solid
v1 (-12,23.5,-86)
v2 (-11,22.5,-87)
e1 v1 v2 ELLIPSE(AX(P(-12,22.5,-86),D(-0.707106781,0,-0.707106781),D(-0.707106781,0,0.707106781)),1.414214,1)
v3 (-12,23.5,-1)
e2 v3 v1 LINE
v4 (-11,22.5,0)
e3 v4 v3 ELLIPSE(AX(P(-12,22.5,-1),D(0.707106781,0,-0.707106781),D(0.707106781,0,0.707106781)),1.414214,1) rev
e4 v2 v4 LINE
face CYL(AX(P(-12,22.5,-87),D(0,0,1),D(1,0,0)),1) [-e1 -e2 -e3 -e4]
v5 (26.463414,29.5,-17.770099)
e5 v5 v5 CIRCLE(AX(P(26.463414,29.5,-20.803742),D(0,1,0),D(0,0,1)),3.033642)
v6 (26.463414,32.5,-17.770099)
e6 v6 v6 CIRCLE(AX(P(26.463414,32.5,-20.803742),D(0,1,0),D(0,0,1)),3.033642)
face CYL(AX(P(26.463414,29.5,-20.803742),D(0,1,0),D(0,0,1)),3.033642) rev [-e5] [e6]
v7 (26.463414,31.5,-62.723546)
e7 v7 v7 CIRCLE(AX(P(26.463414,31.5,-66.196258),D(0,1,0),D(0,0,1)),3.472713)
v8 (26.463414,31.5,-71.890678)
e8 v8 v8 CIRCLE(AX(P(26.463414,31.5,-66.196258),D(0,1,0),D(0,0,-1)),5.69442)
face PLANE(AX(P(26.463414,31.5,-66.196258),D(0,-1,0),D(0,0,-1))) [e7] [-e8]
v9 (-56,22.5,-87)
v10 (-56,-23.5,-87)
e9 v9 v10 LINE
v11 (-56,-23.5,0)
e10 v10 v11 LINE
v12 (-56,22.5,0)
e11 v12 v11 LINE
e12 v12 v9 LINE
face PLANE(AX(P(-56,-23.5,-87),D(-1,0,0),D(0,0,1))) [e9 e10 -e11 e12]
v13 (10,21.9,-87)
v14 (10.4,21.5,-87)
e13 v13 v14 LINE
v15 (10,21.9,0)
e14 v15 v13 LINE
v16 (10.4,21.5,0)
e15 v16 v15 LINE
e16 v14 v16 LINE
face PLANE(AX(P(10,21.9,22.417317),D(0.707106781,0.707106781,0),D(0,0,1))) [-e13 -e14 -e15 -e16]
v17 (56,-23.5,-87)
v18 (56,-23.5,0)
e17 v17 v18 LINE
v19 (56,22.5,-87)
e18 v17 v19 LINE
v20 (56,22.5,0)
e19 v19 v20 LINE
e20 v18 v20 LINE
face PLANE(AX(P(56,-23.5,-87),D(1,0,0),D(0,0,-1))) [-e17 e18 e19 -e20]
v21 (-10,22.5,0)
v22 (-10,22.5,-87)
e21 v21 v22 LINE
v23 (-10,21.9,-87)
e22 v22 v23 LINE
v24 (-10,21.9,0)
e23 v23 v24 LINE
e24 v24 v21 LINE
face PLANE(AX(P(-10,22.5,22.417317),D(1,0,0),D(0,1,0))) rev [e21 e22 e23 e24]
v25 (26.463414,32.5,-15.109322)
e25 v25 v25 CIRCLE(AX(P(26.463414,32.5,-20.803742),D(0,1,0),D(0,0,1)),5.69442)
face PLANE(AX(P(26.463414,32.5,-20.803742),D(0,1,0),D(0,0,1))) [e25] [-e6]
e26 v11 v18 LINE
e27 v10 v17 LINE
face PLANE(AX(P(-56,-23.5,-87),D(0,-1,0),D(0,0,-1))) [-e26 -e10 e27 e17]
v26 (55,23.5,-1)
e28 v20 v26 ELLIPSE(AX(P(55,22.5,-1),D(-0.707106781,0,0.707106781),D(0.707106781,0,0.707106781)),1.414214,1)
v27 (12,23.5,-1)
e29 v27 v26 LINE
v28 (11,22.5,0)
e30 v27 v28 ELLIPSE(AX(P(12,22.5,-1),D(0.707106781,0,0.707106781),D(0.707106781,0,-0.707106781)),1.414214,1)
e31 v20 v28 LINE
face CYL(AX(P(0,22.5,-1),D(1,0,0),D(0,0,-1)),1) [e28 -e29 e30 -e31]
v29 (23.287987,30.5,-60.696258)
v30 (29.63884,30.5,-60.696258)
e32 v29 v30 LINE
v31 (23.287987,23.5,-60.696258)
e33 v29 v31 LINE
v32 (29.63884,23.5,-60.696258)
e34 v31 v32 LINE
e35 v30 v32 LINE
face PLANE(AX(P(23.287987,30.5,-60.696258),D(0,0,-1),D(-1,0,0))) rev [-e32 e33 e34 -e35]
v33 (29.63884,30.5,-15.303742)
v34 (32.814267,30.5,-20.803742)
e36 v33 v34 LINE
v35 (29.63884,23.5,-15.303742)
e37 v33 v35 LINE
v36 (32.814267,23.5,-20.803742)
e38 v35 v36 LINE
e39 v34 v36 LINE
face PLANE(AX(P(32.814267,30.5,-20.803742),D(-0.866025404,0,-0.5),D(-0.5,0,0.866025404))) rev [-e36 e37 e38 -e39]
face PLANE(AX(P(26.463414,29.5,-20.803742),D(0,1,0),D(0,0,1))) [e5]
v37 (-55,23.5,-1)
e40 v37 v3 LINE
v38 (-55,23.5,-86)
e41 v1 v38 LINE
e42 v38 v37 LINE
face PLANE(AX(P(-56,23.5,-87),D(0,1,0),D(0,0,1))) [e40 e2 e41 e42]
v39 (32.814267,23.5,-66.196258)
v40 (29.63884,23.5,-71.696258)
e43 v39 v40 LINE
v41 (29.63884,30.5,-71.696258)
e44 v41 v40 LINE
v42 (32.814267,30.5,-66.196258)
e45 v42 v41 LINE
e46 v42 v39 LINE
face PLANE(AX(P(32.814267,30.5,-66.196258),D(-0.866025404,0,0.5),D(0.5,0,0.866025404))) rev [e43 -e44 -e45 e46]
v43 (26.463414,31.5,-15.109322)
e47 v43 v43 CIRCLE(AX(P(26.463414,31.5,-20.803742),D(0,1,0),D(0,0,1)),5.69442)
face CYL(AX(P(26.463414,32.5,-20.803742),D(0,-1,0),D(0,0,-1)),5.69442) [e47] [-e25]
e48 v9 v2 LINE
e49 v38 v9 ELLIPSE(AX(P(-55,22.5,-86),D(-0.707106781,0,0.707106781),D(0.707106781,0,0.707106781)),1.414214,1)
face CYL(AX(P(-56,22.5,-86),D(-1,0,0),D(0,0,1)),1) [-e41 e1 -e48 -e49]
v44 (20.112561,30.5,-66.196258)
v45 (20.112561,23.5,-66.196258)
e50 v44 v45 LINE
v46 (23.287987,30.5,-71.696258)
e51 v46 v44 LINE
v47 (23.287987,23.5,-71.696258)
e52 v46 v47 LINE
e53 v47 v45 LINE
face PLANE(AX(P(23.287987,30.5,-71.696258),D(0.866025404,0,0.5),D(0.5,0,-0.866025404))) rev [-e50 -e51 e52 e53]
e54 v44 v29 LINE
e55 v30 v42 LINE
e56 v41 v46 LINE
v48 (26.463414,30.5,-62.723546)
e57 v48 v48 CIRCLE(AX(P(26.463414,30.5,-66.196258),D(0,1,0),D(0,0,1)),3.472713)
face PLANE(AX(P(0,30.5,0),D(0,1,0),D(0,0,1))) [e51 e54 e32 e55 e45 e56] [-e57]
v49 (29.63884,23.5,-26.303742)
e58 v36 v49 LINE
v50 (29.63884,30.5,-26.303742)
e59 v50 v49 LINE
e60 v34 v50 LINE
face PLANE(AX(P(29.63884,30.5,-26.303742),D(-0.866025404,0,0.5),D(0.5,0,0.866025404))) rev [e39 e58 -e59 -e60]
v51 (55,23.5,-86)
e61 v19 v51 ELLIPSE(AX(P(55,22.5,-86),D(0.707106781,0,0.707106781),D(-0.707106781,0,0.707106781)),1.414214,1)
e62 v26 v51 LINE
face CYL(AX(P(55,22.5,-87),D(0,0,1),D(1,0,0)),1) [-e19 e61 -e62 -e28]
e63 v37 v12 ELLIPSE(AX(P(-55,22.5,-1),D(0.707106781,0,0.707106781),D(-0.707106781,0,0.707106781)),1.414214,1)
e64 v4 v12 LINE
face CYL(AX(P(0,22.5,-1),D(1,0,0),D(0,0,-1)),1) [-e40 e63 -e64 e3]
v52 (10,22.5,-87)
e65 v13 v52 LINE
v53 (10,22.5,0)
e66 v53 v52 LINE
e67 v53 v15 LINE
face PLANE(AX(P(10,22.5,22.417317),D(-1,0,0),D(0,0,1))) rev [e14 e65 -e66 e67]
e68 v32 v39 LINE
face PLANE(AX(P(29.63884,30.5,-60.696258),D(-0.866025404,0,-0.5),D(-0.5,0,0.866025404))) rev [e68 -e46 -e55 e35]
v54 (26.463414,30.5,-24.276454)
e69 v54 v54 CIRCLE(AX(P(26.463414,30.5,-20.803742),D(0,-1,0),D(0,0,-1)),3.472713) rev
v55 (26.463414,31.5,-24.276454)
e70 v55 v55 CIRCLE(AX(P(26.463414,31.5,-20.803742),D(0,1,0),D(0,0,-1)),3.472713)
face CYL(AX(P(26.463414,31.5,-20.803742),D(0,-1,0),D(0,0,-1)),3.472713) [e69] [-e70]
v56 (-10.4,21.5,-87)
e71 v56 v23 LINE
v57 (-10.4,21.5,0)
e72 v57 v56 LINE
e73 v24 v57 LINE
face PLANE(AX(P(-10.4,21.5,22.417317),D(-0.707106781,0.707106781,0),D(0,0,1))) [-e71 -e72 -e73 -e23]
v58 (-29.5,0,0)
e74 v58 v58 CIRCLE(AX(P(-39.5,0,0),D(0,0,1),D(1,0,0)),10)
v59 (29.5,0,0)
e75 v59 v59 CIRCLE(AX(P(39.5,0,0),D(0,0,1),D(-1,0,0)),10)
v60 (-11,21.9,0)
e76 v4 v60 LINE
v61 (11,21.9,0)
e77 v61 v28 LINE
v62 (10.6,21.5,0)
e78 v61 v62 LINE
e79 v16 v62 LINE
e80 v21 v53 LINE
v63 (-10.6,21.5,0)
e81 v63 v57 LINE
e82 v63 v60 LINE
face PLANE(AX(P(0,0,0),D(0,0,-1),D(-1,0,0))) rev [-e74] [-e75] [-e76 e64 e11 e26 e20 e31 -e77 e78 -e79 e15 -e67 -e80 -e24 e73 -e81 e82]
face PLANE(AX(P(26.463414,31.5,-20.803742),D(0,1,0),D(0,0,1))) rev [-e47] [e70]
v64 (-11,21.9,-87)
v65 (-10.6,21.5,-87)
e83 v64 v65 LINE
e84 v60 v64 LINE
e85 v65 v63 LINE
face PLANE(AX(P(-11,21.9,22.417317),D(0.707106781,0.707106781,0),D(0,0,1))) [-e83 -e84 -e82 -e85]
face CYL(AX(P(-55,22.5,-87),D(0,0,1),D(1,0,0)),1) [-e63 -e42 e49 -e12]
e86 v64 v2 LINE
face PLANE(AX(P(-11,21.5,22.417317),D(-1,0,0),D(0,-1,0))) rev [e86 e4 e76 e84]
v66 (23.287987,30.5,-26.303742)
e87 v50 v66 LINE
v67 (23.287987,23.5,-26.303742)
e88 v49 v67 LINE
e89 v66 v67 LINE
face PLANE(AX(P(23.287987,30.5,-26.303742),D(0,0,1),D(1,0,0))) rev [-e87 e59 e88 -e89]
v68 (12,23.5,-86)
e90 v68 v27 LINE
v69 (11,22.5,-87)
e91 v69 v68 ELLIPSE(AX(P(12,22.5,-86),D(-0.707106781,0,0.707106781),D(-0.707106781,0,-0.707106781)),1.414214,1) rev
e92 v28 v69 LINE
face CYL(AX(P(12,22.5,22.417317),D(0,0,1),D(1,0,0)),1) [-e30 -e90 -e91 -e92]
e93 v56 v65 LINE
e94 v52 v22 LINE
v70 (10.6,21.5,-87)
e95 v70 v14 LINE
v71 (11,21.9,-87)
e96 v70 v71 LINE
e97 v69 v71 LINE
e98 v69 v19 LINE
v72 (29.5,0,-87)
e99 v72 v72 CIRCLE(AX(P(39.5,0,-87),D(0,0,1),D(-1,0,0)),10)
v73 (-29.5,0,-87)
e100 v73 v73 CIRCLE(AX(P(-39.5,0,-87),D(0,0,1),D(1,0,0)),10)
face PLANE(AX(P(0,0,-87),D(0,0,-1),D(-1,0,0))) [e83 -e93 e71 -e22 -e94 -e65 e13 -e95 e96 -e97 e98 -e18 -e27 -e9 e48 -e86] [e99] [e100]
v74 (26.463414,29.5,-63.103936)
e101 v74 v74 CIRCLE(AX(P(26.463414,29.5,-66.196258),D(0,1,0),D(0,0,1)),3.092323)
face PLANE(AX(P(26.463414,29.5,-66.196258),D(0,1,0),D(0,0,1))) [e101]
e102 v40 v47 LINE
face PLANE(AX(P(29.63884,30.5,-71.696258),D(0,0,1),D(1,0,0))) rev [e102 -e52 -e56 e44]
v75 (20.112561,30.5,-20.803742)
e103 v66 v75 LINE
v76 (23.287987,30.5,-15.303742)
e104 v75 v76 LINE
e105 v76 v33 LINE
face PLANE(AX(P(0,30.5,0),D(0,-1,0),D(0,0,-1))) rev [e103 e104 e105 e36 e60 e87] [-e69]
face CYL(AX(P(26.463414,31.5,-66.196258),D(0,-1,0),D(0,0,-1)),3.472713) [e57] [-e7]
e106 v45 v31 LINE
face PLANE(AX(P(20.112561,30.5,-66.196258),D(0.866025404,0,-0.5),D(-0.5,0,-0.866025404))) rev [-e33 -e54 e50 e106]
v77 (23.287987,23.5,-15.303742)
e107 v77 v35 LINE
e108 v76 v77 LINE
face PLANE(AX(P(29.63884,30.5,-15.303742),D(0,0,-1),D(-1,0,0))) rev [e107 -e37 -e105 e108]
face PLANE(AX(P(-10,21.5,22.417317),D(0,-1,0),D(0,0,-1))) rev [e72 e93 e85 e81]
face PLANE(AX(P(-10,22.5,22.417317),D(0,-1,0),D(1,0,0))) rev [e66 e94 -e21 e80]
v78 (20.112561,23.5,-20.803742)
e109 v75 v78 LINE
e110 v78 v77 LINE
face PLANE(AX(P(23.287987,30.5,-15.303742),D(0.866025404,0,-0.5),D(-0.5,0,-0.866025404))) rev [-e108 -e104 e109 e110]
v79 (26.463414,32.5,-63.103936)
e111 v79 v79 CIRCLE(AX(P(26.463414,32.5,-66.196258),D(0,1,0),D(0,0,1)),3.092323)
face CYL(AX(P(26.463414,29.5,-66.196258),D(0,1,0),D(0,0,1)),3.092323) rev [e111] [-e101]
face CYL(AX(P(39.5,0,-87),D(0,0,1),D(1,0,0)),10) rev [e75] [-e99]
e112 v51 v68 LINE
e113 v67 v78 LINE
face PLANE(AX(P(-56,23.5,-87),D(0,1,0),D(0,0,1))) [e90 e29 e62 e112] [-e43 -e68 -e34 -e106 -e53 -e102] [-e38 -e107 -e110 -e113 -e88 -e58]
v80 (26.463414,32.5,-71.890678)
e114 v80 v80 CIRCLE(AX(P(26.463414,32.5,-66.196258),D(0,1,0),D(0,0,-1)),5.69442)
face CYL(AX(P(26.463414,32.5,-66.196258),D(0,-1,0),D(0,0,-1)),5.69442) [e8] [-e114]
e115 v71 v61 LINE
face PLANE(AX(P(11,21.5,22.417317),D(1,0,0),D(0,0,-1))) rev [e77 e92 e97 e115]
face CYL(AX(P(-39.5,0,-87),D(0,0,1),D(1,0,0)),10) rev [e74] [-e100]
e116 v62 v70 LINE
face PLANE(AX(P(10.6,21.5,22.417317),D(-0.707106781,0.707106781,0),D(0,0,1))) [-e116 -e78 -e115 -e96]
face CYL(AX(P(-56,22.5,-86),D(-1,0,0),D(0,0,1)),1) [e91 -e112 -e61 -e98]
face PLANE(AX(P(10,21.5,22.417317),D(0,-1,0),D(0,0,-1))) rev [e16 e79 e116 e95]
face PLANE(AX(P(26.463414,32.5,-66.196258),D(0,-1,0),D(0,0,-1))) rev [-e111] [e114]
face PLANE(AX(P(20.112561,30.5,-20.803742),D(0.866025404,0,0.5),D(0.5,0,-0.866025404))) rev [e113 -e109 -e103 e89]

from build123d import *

# Parameters (mm, degrees)
CROQUIS1_W              = 112
CROQUIS1_H              = 47
SALIENTE_EXTRUIR1_DEPTH = 87
CROQUIS2_R              = 10
CORTAR_EXTRUIR1_DEPTH   = 87
CORTAR_EXTRUIR2_DEPTH   = 87
CHAFL_N1_SIZE           = 0.4
CHAFL_N2_SIZE           = 0.4
REDONDEO1_R             = 1
REDONDEO2_R             = 1
SALIENTE_EXTRUIR2_DEPTH = 7
CROQUIS6_R              = 3.472712807
SALIENTE_EXTRUIR3_DEPTH = 1
CROQUIS7_R              = 5.694419986
SALIENTE_EXTRUIR4_DEPTH = 1
CROQUIS8_R              = 3.033642273
CROQUIS8_R_2            = 3.0923226
CORTAR_EXTRUIR3_DEPTH   = 3


with BuildPart() as part:
    # Croquis1 → Saliente-Extruir1 (new body)
    with BuildSketch(Plane.XY):
        Rectangle(CROQUIS1_W, CROQUIS1_H)
    extrude(amount=-SALIENTE_EXTRUIR1_DEPTH)

    # Croquis2 → Cortar-Extruir1 (cut)
    with BuildSketch(Plane.XY):
        with Locations((-39.5, 0)):
            Circle(CROQUIS2_R)
        with Locations(Location((39.5, 0, 0), (0, 0, 180))):
            Circle(CROQUIS2_R)
    extrude(amount=-CORTAR_EXTRUIR1_DEPTH, mode=Mode.SUBTRACT)

    # Croquis4 → Cortar-Extruir2 (cut)
    with BuildSketch(Plane(origin=(0, 0, -87), x_dir=(-1, 0, 0), z_dir=(0, 0, -1))):
        Polygon((10, 22.5), (-10, 22.5), (-10, 21.5), (-11, 21.5), (-11, 23.5), (0, 25.805357454), (11, 23.5), (11, 21.5), (10, 21.5), align=None)
    extrude(amount=-CORTAR_EXTRUIR2_DEPTH, mode=Mode.SUBTRACT)

    # Chaflán1
    chafl_n1_edges = [part.edges().sort_by_distance(p)[0] for p in [
        (-11, 21.5, -43.5),
        (-10, 21.5, -43.5),
    ]]
    chamfer(chafl_n1_edges, length=CHAFL_N1_SIZE)

    # Chaflán2
    chafl_n2_edges = [part.edges().sort_by_distance(p)[0] for p in [
        (10, 21.5, -43.5),
        (11, 21.5, -43.5),
    ]]
    chamfer(chafl_n2_edges, length=CHAFL_N2_SIZE)

    # Redondeo1
    redondeo1_edges = [part.edges().sort_by_distance(p)[0] for p in [
        (-33.5, 23.5, 0),
        (-33.5, 23.5, -87),
        (33.5, 23.5, 0),
        (33.5, 23.5, -87),
        (-56, 23.5, -43.5),
        (56, 23.5, -43.5),
    ]]
    fillet(redondeo1_edges, radius=REDONDEO1_R)

    # Redondeo2
    # the kernel refuses this fillet: 1 mm, written as the material it takes off along each edge
    with BuildSketch(Plane(origin=(-11, 23.5, -88.5), x_dir=(0, -1, 0), z_dir=(0, 0, 1))) as redondeo2_piece_1:
        with BuildLine():
            CenterArc((REDONDEO2_R, -REDONDEO2_R), REDONDEO2_R, 90, 90)
            Line((0, -REDONDEO2_R), (0, 0))
            Line((0, 0), (REDONDEO2_R, 0))
        make_face()
    extrude(amount=90, mode=Mode.SUBTRACT)
    with BuildSketch(Plane(origin=(11, 23.5, -88.5), x_dir=(0, -1, 0), z_dir=(0, 0, 1))) as redondeo2_piece_2:
        with BuildLine():
            CenterArc((REDONDEO2_R, REDONDEO2_R), REDONDEO2_R, 180, 90)
            Line((0, REDONDEO2_R), (0, 0))
            Line((0, 0), (REDONDEO2_R, 0))
        make_face()
    extrude(amount=90, mode=Mode.SUBTRACT)

    # Croquis5 → Saliente-Extruir2 (add)
    with BuildSketch(Plane(origin=(0, 23.5, 0), x_dir=(1, 0, 0), z_dir=(0, 1, 0))):
        Polygon((32.814266538, 66.19625833), (29.638840058, 71.69625833), (23.287987096, 71.69625833), (20.112560616, 66.19625833), (23.287987096, 60.69625833), (29.638840058, 60.69625833), align=None)
        Polygon((29.638840058, 26.30374167), (32.814266538, 20.80374167), (29.638840058, 15.30374167), (23.287987096, 15.30374167), (20.112560616, 20.80374167), (23.287987096, 26.30374167), align=None)
    extrude(amount=SALIENTE_EXTRUIR2_DEPTH)

    # Croquis6 → Saliente-Extruir3 (add)
    with BuildSketch(Plane(origin=(0, 30.5, 0), x_dir=(1, 0, 0), z_dir=(0, 1, 0))):
        with Locations(Location((26.463413577, 66.19625833, 0), (0, 0, 270))):
            Circle(CROQUIS6_R)
        with Locations(Location((26.463413577, 20.80374167, 0), (0, 0, 90))):
            Circle(CROQUIS6_R)
    extrude(amount=SALIENTE_EXTRUIR3_DEPTH)

    # Croquis7 → Saliente-Extruir4 (add)
    with BuildSketch(Plane(origin=(0, 31.5, 0), x_dir=(1, 0, 0), z_dir=(0, 1, 0))):
        with Locations(Location((26.463413577, 20.80374167, 0), (0, 0, 270))):
            Circle(CROQUIS7_R)
        with Locations(Location((26.463413577, 66.19625833, 0), (0, 0, 90))):
            Circle(CROQUIS7_R)
    extrude(amount=SALIENTE_EXTRUIR4_DEPTH)

    # Croquis8 → Cortar-Extruir3 (cut)
    with BuildSketch(Plane(origin=(0, 32.5, 0), x_dir=(1, 0, 0), z_dir=(0, 1, 0))):
        with Locations(Location((26.463413577, 20.80374167, 0), (0, 0, 270))):
            Circle(CROQUIS8_R)
        with Locations(Location((26.463413577, 66.19625833, 0), (0, 0, 270))):
            Circle(CROQUIS8_R_2)
    extrude(amount=-CORTAR_EXTRUIR3_DEPTH, mode=Mode.SUBTRACT)


solid = part.part
